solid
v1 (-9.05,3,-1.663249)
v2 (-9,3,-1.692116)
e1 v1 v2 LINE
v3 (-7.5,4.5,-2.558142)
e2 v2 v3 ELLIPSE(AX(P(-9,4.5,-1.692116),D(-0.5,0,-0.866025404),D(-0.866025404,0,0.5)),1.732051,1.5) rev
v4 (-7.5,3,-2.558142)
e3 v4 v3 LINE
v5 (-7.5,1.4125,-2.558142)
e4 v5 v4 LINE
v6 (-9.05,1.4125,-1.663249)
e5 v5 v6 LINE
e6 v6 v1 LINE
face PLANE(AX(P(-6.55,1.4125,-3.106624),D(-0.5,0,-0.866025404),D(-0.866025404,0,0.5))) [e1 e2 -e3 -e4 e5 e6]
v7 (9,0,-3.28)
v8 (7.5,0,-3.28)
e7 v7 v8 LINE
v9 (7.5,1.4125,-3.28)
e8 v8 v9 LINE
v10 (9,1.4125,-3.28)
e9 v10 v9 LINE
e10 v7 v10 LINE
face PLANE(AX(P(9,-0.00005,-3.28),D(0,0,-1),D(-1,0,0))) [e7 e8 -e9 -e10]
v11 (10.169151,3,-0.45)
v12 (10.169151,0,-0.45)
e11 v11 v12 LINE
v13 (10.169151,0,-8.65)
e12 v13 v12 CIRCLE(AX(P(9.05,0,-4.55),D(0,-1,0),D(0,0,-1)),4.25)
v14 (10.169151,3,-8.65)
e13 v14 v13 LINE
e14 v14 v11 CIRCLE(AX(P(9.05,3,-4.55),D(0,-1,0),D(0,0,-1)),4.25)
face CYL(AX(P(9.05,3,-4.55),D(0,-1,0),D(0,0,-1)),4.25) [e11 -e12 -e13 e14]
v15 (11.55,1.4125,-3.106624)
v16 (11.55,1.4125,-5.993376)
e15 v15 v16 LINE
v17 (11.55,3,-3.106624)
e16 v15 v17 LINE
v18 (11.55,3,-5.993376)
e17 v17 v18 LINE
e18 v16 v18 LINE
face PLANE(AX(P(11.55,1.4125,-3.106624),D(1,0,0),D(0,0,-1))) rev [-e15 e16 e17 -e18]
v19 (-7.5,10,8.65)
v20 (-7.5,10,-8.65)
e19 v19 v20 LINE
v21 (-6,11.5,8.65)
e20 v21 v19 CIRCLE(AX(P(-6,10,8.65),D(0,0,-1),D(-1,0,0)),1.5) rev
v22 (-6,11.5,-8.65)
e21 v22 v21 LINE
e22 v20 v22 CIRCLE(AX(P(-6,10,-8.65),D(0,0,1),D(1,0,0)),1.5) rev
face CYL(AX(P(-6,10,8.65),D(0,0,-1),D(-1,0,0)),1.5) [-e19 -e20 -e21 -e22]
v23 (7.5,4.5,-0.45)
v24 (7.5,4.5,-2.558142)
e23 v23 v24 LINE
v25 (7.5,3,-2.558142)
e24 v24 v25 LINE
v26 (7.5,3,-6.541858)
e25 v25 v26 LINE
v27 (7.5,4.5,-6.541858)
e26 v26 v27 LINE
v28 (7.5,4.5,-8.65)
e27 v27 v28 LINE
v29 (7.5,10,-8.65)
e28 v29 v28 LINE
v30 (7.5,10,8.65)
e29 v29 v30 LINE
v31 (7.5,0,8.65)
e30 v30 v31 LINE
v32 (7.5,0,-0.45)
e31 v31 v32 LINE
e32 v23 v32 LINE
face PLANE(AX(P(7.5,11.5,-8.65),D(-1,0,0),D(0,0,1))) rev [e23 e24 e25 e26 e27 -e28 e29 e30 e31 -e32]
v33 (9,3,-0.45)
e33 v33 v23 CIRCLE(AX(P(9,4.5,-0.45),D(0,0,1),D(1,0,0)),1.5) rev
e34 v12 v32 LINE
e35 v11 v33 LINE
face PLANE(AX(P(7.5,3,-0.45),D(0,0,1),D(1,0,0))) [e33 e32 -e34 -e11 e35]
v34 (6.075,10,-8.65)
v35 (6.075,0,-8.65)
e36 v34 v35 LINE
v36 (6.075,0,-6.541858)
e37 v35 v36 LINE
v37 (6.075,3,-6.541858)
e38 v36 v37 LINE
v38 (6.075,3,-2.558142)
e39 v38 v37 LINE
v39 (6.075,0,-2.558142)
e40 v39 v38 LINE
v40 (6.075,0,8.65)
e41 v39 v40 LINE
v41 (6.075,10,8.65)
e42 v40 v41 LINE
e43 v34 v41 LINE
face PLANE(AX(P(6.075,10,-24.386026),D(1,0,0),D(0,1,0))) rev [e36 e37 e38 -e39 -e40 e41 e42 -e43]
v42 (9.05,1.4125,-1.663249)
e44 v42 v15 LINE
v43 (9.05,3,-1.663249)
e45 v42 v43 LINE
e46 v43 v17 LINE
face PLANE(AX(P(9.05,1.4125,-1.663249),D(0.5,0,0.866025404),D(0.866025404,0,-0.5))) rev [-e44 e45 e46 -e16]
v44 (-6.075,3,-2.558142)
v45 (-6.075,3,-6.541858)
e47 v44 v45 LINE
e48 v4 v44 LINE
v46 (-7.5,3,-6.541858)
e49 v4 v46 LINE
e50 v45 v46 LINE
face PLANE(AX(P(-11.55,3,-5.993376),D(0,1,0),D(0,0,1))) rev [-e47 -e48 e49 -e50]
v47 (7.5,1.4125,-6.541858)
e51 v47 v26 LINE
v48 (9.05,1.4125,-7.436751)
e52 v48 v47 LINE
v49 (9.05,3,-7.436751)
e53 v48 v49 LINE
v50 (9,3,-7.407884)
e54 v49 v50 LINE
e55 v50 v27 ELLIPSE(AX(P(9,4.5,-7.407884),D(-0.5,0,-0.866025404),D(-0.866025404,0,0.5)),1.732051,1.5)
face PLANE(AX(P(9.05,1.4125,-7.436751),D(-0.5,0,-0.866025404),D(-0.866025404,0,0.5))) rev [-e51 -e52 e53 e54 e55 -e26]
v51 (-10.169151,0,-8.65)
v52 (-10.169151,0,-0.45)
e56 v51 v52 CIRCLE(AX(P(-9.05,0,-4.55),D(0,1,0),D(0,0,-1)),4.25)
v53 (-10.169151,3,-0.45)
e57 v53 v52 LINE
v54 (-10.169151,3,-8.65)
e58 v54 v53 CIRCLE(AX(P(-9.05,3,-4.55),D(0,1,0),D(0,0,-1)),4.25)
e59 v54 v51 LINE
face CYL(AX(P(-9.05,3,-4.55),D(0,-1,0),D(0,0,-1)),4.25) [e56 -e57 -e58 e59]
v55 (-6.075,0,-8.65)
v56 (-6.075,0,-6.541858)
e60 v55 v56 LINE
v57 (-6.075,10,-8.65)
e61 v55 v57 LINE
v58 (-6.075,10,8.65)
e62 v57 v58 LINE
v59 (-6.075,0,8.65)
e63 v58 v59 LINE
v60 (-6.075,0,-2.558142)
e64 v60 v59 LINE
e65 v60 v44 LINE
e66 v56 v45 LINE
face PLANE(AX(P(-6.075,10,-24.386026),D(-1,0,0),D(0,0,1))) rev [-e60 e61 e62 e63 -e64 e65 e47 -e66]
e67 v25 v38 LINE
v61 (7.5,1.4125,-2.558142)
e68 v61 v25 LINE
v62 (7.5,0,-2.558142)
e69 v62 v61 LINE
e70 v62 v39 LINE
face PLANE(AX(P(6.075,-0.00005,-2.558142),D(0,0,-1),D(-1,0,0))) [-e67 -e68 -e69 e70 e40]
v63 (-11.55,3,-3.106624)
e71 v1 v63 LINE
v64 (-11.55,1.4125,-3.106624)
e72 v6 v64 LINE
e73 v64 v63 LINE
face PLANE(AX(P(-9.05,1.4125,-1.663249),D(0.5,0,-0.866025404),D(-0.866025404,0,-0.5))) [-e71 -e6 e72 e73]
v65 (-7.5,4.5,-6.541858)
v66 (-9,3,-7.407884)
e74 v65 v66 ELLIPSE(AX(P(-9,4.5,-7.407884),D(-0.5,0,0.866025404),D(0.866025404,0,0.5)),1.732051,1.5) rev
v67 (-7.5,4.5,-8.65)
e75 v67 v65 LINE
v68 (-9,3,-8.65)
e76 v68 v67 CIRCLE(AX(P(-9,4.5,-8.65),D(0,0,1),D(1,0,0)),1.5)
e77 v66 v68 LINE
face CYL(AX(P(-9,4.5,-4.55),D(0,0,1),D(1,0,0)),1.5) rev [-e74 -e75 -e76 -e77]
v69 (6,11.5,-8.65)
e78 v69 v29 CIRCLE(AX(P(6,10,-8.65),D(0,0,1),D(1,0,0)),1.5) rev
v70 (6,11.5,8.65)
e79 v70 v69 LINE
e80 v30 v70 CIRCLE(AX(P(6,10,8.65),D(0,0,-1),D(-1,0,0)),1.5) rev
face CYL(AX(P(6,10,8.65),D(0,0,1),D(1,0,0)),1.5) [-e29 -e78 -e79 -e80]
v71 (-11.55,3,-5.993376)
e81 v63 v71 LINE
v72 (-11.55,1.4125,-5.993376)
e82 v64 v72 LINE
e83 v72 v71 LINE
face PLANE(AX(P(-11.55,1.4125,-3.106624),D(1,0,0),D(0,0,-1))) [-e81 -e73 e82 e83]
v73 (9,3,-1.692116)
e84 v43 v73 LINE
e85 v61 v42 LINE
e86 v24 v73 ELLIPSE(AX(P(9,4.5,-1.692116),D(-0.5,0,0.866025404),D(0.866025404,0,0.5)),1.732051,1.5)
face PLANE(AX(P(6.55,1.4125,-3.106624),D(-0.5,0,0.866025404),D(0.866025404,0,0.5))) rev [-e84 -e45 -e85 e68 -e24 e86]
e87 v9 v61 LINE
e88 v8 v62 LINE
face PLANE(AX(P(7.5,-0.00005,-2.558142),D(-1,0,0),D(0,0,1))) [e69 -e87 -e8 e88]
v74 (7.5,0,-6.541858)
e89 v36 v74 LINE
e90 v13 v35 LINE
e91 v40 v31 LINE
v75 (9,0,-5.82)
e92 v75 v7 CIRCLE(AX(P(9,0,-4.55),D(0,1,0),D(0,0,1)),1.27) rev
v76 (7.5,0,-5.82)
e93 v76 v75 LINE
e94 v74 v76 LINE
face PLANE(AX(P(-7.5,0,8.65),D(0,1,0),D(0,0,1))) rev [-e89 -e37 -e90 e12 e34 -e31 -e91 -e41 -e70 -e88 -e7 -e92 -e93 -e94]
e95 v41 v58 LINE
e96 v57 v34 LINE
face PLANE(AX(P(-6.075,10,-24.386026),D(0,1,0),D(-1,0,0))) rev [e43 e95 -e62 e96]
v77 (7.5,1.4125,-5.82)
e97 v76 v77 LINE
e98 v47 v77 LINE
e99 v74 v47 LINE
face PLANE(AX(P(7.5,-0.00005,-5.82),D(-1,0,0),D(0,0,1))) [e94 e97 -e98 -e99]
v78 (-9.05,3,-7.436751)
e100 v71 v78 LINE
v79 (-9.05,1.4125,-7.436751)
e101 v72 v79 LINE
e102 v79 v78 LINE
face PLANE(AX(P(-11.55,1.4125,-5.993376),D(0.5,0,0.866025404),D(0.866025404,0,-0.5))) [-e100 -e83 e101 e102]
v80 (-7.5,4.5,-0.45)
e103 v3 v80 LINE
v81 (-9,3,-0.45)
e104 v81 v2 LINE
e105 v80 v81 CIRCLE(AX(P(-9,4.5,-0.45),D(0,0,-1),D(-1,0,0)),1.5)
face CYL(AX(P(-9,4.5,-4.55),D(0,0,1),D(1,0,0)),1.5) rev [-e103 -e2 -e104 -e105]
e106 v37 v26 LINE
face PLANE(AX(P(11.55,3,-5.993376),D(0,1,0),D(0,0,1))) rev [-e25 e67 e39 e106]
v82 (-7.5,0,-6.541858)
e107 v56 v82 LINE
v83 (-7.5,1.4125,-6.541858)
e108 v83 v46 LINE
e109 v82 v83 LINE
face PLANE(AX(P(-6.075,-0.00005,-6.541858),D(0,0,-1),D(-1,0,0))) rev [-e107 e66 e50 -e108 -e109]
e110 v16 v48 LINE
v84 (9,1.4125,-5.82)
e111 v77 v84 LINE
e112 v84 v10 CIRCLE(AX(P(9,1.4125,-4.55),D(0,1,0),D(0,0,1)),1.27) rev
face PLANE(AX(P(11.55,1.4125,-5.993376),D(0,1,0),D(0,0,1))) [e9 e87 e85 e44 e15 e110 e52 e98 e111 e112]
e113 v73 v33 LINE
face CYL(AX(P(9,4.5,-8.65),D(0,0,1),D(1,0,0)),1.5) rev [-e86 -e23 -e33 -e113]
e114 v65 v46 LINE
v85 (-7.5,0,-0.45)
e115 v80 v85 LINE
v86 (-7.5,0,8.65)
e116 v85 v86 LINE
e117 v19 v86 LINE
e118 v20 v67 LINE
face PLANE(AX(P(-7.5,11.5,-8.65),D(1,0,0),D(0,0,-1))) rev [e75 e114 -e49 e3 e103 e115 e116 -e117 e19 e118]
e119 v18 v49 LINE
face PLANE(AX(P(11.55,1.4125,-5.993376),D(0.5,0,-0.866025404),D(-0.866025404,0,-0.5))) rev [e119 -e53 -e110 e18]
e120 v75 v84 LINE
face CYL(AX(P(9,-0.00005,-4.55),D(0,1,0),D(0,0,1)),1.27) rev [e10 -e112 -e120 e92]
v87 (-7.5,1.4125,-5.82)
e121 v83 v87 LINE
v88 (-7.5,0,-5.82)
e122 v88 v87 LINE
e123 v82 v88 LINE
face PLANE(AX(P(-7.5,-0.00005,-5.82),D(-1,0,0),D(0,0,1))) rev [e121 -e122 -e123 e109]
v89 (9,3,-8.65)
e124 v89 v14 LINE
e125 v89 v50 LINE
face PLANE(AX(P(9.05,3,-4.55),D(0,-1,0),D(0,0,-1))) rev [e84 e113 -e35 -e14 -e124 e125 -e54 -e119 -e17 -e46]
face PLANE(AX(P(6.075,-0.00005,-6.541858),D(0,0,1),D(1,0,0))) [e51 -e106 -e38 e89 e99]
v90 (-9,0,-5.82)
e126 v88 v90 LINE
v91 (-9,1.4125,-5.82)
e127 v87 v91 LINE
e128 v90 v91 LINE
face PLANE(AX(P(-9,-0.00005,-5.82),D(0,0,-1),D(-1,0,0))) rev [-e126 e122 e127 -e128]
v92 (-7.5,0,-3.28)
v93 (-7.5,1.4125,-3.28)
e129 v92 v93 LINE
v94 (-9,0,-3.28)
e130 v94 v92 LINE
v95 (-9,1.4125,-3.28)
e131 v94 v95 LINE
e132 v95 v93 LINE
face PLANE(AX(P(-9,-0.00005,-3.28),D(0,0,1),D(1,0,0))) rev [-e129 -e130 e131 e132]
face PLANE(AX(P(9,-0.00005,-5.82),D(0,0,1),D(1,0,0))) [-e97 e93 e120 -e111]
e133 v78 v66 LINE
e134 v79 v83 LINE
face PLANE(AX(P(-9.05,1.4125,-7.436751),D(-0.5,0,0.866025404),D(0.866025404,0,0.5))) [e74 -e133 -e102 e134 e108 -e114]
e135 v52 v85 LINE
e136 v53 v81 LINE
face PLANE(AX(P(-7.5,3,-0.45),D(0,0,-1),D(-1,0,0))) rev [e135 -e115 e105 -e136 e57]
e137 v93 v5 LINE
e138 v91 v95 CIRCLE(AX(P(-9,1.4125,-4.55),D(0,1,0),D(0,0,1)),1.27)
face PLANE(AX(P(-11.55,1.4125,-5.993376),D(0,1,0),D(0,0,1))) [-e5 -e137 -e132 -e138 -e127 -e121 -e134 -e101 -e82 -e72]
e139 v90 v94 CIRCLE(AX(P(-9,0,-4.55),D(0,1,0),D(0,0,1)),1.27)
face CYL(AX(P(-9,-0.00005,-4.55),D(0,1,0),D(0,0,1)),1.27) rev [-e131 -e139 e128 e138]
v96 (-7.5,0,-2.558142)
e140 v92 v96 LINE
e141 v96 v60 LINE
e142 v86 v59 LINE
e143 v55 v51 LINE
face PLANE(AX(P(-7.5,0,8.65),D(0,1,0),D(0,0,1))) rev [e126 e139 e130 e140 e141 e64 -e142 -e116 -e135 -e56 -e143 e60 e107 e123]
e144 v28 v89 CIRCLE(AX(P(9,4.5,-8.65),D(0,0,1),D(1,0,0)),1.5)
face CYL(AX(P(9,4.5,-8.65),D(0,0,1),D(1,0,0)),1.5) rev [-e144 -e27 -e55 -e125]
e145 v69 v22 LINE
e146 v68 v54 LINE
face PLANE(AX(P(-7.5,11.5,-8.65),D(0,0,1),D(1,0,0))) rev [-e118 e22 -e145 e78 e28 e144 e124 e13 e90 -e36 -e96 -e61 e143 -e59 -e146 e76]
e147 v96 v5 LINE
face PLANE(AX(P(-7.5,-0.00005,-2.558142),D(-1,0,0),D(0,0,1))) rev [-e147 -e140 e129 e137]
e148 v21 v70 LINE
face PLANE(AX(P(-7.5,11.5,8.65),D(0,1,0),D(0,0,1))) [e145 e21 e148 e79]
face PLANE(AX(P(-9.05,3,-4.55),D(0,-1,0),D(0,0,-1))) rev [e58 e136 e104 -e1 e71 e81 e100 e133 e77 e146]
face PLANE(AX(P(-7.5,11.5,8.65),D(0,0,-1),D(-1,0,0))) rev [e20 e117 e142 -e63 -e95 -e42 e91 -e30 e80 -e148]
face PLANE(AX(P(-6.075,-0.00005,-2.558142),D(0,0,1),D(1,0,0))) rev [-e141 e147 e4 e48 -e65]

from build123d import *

# Parameters (mm, degrees)
SKETCH1_W          = 15
SKETCH1_H          = 17.3
EXTRUDE1_DEPTH     = 11.5
SKETCH2_W          = 12.15
SKETCH2_H          = 10
EXTRUDE2_DEPTH     = 17.3
EXTRUDE3_DEPTH     = 3
CUT_EXTRUDE3_DEPTH = 1.5875
CUT_EXTRUDE1_DEPTH = 18.998958303
FILLET3_R          = 1.5
FILLET1_R          = 1.5


with BuildPart() as part:
    # Sketch1 → Extrude1 (new body)
    with BuildSketch(Plane(origin=(0, 0, 0), x_dir=(1, 0, 0), z_dir=(0, 1, 0))):
        Rectangle(SKETCH1_W, SKETCH1_H)
    extrude(amount=EXTRUDE1_DEPTH)

    # Sketch2 → Extrude2 (cut)
    with BuildSketch(Plane.XY.offset(8.65)):
        with Locations((0, 5)):
            Rectangle(SKETCH2_W, SKETCH2_H)
    extrude(amount=-EXTRUDE2_DEPTH, mode=Mode.SUBTRACT)

    # Sketch3 → Extrude3 (add)
    with BuildSketch(Plane.XZ):
        with BuildLine():
            Line((7.5, -8.65), (10.169151464, -8.65))
            ThreePointArc((10.169151464, -8.65), (13.3, -4.55), (10.169151464, -0.45))
            Line((10.169151464, -0.45), (7.5, -0.45))
            Line((7.5, -0.45), (7.5, -8.65))
        make_face()
    extrude3 = extrude(amount=-EXTRUDE3_DEPTH)

    # Sketch8 → Cut-Extrude3 (cut)
    with BuildSketch(Plane(origin=(0, 3, 0), x_dir=(-1, 0, 0), z_dir=(0, 1, 0))):
        Polygon((-11.55, -5.993375673), (-9.05, -7.436751346), (-6.55, -5.993375673), (-6.55, -3.106624327), (-9.05, -1.663248654), (-11.55, -3.106624327), align=None)
    cut_extrude3 = extrude(amount=-CUT_EXTRUDE3_DEPTH, mode=Mode.SUBTRACT)

    # Sketch5 → Cut-Extrude1 (cut, through all)
    with BuildSketch(Plane.XZ.offset(-3)):
        with BuildLine():
            Line((9, -5.82), (7.5, -5.82))
            Line((7.5, -5.82), (7.5, -6.541858429))
            Line((7.5, -6.541858429), (6.075, -6.541858429))
            Line((6.075, -6.541858429), (6.075, -2.558141571))
            Line((6.075, -2.558141571), (7.5, -2.558141571))
            Line((7.5, -2.558141571), (7.5, -3.28))
            Line((7.5, -3.28), (9, -3.28))
            ThreePointArc((9, -3.28), (10.27, -4.55), (9, -5.82))
        make_face()
    cut_extrude1 = extrude(amount=CUT_EXTRUDE1_DEPTH, mode=Mode.SUBTRACT)

    # Mirror3: Extrude3, Cut-Extrude3, Cut-Extrude1 across plane
    add(extrude3.mirror(Plane(origin=(0, 0, 0), x_dir=(0, 0, 1), z_dir=(1, 0, 0))))
    add(cut_extrude3.mirror(Plane(origin=(0, 0, 0), x_dir=(0, 0, 1), z_dir=(1, 0, 0))), mode=Mode.SUBTRACT)
    add(cut_extrude1.mirror(Plane(origin=(0, 0, 0), x_dir=(0, 0, 1), z_dir=(1, 0, 0))), mode=Mode.SUBTRACT)

    # Fillet3
    fillet3_edges = [part.edges().sort_by_distance(p)[0] for p in [
        (-7.5, 11.5, 0),
        (7.5, 11.5, 0),
    ]]
    fillet(fillet3_edges, radius=FILLET3_R)

    # Fillet1
    # the kernel refuses this fillet: 1.5 mm, written as the material it adds along each edge
    with BuildSketch(Plane(origin=(7.5, 3, -0.45), x_dir=(0, 1, 0), z_dir=(0, 0, -1))) as fillet1_piece_1_section:
        with BuildLine():
            CenterArc((FILLET1_R, FILLET1_R), FILLET1_R, 180, 90)
            Line((0, FILLET1_R), (0, 0))
            Line((0, 0), (FILLET1_R, 0))
        make_face()
    fillet1_piece_1 = extrude(amount=5.858141571, mode=Mode.PRIVATE)
    fillet1_piece_1 = split(fillet1_piece_1, bisect_by=Plane(origin=(8.228724566, 3.349084614, -2.137412247), z_dir=(-0.5000000000000001, 0, 0.8660254037844386)), keep=Keep.TOP, mode=Mode.PRIVATE)
    add(fillet1_piece_1)
    with BuildSketch(Plane(origin=(7.5, 3, -2.791858429), x_dir=(0, 1, 0), z_dir=(0, 0, -1))) as fillet1_piece_2_section:
        with BuildLine():
            CenterArc((FILLET1_R, FILLET1_R), FILLET1_R, 180, 90)
            Line((0, FILLET1_R), (0, 0))
            Line((0, 0), (FILLET1_R, 0))
        make_face()
    fillet1_piece_2 = extrude(amount=5.858141571, mode=Mode.PRIVATE)
    fillet1_piece_2 = split(fillet1_piece_2, bisect_by=Plane(origin=(8.228724566, 3.349084614, -6.962587753), z_dir=(-0.5000000000000002, 0, -0.8660254037844386)), keep=Keep.TOP, mode=Mode.PRIVATE)
    add(fillet1_piece_2)
    with BuildSketch(Plane(origin=(-7.5, 3, -2.791858429), x_dir=(0, 1, 0), z_dir=(0, 0, -1))) as fillet1_piece_3_section:
        with BuildLine():
            CenterArc((FILLET1_R, -FILLET1_R), FILLET1_R, 90, 90)
            Line((0, -FILLET1_R), (0, 0))
            Line((0, 0), (FILLET1_R, 0))
        make_face()
    fillet1_piece_3 = extrude(amount=5.858141571, mode=Mode.PRIVATE)
    fillet1_piece_3 = split(fillet1_piece_3, bisect_by=Plane(origin=(-8.228724566, 3.349084614, -6.962587753), z_dir=(0.5000000000000002, 0, -0.8660254037844386)), keep=Keep.TOP, mode=Mode.PRIVATE)
    add(fillet1_piece_3)
    with BuildSketch(Plane(origin=(-7.5, 3, -0.45), x_dir=(0, 1, 0), z_dir=(0, 0, -1))) as fillet1_piece_4_section:
        with BuildLine():
            CenterArc((FILLET1_R, -FILLET1_R), FILLET1_R, 90, 90)
            Line((0, -FILLET1_R), (0, 0))
            Line((0, 0), (FILLET1_R, 0))
        make_face()
    fillet1_piece_4 = extrude(amount=5.858141571, mode=Mode.PRIVATE)
    fillet1_piece_4 = split(fillet1_piece_4, bisect_by=Plane(origin=(-8.228724566, 3.349084614, -2.137412247), z_dir=(0.5000000000000001, 0, 0.8660254037844386)), keep=Keep.TOP, mode=Mode.PRIVATE)
    add(fillet1_piece_4)


solid = part.part
